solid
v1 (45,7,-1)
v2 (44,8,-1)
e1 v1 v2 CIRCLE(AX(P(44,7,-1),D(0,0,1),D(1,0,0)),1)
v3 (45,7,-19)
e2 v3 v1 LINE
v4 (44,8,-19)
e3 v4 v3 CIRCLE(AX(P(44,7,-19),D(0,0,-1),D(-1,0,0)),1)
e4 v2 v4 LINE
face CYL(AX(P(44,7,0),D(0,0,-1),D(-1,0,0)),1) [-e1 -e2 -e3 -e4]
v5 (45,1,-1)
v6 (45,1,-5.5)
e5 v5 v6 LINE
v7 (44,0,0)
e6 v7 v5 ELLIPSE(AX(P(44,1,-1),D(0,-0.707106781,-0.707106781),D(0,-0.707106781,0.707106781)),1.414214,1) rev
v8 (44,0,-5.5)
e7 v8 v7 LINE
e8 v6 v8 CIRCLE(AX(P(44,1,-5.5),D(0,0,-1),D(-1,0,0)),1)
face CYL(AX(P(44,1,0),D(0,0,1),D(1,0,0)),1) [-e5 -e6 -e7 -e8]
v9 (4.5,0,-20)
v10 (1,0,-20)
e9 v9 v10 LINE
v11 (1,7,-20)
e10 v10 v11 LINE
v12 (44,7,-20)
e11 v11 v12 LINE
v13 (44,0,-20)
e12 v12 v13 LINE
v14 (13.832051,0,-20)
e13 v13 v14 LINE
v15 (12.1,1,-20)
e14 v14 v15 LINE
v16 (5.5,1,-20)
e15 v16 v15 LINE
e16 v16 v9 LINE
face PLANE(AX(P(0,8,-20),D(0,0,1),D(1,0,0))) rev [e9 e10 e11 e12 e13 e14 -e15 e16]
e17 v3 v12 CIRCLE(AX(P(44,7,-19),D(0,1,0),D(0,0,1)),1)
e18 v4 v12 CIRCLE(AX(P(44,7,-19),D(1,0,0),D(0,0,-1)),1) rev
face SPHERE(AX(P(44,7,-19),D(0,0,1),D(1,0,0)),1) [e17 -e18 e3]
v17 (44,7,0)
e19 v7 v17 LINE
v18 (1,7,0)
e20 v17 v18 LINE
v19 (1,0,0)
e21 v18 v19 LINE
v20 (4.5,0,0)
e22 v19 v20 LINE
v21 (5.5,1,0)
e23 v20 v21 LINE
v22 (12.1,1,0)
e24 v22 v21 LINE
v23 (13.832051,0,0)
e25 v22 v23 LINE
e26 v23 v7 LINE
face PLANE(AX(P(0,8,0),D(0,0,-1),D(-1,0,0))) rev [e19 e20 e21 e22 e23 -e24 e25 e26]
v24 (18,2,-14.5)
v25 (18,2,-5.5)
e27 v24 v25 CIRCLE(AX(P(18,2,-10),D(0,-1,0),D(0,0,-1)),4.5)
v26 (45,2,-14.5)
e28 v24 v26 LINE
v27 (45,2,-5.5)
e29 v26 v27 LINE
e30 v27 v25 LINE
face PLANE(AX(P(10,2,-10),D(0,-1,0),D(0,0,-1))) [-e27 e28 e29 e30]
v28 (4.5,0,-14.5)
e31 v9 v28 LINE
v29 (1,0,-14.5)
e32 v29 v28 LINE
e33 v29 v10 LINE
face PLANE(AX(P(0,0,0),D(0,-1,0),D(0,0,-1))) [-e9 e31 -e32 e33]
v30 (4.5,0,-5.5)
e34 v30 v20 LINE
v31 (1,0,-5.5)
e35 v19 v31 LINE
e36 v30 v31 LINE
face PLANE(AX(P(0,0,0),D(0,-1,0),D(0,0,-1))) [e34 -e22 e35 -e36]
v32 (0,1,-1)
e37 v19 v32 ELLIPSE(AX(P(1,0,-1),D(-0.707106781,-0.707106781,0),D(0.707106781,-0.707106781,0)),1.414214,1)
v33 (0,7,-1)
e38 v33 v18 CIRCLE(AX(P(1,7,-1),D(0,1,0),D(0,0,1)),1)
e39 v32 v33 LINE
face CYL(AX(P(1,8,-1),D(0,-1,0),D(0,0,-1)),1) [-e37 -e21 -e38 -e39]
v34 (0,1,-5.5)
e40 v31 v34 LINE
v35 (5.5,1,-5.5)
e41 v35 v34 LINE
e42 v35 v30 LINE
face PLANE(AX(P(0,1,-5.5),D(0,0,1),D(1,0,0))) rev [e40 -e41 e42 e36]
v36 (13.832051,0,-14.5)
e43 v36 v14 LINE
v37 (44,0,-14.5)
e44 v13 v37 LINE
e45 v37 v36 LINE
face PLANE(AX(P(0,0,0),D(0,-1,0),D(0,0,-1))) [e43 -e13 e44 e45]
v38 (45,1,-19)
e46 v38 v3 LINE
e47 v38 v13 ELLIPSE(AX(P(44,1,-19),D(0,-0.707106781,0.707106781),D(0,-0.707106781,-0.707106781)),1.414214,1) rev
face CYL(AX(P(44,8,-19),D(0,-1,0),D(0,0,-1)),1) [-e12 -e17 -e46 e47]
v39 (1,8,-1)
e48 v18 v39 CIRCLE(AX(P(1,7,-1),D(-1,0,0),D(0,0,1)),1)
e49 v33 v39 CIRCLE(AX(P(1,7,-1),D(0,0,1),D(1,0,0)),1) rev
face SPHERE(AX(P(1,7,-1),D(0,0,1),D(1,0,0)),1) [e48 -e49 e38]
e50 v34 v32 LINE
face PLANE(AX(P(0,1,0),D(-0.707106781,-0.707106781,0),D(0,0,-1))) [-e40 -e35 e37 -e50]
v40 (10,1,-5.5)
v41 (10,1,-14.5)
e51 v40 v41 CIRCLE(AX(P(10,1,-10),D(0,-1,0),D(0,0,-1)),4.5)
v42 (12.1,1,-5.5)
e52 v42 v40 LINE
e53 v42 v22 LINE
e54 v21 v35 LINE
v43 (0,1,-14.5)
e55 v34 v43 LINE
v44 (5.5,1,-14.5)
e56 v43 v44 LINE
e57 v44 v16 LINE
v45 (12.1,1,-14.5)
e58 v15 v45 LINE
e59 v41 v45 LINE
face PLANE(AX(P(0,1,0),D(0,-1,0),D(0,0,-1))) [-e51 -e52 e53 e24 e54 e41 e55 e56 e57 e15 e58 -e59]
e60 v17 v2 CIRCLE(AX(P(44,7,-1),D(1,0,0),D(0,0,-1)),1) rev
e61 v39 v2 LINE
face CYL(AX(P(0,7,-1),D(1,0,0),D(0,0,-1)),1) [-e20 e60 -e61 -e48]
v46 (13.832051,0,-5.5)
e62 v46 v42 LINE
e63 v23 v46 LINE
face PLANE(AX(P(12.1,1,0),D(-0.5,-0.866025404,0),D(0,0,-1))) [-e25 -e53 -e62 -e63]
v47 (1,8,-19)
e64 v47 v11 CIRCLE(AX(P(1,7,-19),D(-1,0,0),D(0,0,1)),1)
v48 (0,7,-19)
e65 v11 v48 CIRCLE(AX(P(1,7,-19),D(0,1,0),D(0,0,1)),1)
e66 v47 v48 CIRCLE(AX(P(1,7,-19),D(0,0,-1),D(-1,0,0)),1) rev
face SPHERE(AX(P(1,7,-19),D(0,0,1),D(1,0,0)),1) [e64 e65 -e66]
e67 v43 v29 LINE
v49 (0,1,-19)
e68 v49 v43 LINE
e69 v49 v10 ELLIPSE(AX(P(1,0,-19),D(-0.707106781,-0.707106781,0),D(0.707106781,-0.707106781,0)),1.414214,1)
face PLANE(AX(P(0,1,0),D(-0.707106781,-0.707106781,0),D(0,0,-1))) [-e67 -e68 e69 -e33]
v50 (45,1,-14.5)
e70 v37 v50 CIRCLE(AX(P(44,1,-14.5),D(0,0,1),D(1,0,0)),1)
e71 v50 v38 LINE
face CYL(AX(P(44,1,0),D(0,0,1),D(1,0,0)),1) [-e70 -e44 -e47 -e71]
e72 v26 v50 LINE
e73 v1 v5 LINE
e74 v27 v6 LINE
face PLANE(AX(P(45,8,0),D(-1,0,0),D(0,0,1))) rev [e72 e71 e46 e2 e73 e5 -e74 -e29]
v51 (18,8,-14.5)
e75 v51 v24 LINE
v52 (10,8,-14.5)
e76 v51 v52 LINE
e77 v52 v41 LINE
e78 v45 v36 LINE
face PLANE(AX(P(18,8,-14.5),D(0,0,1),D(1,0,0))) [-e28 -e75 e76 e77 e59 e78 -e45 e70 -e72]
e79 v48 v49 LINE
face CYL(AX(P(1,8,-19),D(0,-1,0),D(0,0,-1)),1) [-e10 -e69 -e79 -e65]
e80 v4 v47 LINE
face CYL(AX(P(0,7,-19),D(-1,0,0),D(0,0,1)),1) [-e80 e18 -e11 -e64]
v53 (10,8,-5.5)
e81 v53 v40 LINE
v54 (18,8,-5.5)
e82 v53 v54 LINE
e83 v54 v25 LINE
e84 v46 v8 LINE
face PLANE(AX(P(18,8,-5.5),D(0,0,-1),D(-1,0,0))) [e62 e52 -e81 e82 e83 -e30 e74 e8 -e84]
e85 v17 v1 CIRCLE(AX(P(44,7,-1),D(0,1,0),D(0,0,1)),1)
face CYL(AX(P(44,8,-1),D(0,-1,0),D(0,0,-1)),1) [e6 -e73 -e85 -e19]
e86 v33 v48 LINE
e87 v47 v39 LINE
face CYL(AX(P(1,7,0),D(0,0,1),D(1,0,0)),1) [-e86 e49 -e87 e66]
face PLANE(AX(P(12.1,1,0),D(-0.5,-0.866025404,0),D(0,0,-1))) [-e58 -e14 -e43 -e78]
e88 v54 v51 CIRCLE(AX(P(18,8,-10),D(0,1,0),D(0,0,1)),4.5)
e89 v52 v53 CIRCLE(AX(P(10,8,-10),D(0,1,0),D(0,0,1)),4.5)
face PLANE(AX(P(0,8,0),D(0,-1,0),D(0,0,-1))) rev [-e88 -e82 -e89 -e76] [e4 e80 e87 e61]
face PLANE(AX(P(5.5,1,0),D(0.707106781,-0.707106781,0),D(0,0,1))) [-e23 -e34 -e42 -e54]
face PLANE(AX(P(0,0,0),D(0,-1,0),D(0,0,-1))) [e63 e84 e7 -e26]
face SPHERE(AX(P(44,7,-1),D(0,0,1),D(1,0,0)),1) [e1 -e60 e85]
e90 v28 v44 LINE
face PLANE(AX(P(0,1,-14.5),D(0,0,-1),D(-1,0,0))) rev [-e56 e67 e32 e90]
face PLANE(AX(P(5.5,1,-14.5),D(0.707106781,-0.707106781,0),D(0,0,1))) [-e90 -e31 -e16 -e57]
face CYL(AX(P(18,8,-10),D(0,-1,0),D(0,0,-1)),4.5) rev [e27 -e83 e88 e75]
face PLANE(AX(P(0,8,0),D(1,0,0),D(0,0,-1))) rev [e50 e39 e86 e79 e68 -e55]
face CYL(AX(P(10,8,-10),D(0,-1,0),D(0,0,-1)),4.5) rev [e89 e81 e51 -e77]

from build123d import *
from OCP.BRepFilletAPI import BRepFilletAPI_MakeChamfer

# Parameters (mm, degrees)
SKETCH_1_W          = 45
SKETCH_1_H          = 20
EXTRUDE_1_DEPTH     = 8
CUT_EXTRUDE_1_DEPTH = 2
CUT_EXTRUDE_2_DEPTH = 1
CHAMFER_1_SIZE      = 1
CHAMFER_2_SIZE      = 1
CHAMFER_2_SIZE_2    = 1.732050808
FILLET_1_R          = 1


with BuildPart() as part:
    # 草图1 → 凸台-拉伸1 (new body)
    with BuildSketch(Plane(origin=(0, 0, 0), x_dir=(1, 0, 0), z_dir=(0, 1, 0))):
        with Locations((22.5, 10)):
            Rectangle(SKETCH_1_W, SKETCH_1_H)
        with BuildLine():
            Line((18, 5.5), (10, 5.5))
            ThreePointArc((10, 5.5), (5.5, 10), (10, 14.5))
            Line((10, 14.5), (18, 14.5))
            ThreePointArc((18, 14.5), (22.5, 10), (18, 5.5))
        make_face(mode=Mode.SUBTRACT)
    extrude(amount=EXTRUDE_1_DEPTH)

    # 草图2 → 切除-拉伸1 (cut)
    with BuildSketch(Plane.XZ):
        with BuildLine():
            Line((45, -5.5), (45, -14.5))
            Line((45, -14.5), (10, -14.5))
            ThreePointArc((10, -14.5), (5.5, -10), (10, -5.5))
            Line((10, -5.5), (45, -5.5))
        make_face()
    extrude(amount=-CUT_EXTRUDE_1_DEPTH, mode=Mode.SUBTRACT)

    # 草图3 → 切除-拉伸2 (cut)
    with BuildSketch(Plane.XZ):
        Polygon((0, -5.5), (5.5, -5.5), (5.5, 0), (12.1, 0), (12.1, -20), (5.5, -20), (5.5, -14.5), (0, -14.5), align=None)
    extrude(amount=-CUT_EXTRUDE_2_DEPTH, mode=Mode.SUBTRACT)

    # 倒角1
    chamfer_1_edges = [part.edges().sort_by_distance(p)[0] for p in [
        (0, 0, -17.25),
        (5.5, 0, -17.25),
        (5.5, 0, -2.75),
        (0, 0, -2.75),
    ]]
    chamfer(chamfer_1_edges, length=CHAMFER_1_SIZE - 0.0001)  # a hair under: the kernel refuses the full size

    # 倒角2
    chamfer_2_edges_1 = [part.edges().sort_by_distance(p)[0] for p in [
        (12.1, 0, -17.25),
    ]]
    chamfer_2_side_1 = [part.faces().sort_by_distance(p)[0] for p in [
        (12.1, 0.02, -17.25),
    ]]
    chamfer_2_edges_2 = [part.edges().sort_by_distance(p)[0] for p in [
        (12.1, 0, -2.75),
    ]]
    chamfer_2_side_2 = [part.faces().sort_by_distance(p)[0] for p in [
        (12.1, 0.02, -2.75),
    ]]
    chamfer_2 = BRepFilletAPI_MakeChamfer(part.part.solid().wrapped)
    for e in chamfer_2_edges_1:
        chamfer_2.Add(CHAMFER_2_SIZE - 0.0001, CHAMFER_2_SIZE_2 - 0.0001, e.wrapped, chamfer_2_side_1[0].wrapped)
    for e in chamfer_2_edges_2:
        chamfer_2.Add(CHAMFER_2_SIZE - 0.0001, CHAMFER_2_SIZE_2 - 0.0001, e.wrapped, chamfer_2_side_2[0].wrapped)
    add(Compound.cast(chamfer_2.Shape()), mode=Mode.REPLACE)  # a hair under: the kernel refuses the full size

    # 圆角1
    fillet_1_edges = [part.edges().sort_by_distance(p)[0] for p in [
        (22.5, 8, -20),
        (45, 8, -10),
        (22.5, 8, 0),
        (0, 8, -10),
        (45, 4, 0),
        (45, 4, -20),
        (0, 4.49995, -20),
        (0, 4.49995, 0),
        (45, 0, -17.25),
        (45, 0, -2.75),
    ]]
    fillet(fillet_1_edges, radius=FILLET_1_R)


solid = part.part
